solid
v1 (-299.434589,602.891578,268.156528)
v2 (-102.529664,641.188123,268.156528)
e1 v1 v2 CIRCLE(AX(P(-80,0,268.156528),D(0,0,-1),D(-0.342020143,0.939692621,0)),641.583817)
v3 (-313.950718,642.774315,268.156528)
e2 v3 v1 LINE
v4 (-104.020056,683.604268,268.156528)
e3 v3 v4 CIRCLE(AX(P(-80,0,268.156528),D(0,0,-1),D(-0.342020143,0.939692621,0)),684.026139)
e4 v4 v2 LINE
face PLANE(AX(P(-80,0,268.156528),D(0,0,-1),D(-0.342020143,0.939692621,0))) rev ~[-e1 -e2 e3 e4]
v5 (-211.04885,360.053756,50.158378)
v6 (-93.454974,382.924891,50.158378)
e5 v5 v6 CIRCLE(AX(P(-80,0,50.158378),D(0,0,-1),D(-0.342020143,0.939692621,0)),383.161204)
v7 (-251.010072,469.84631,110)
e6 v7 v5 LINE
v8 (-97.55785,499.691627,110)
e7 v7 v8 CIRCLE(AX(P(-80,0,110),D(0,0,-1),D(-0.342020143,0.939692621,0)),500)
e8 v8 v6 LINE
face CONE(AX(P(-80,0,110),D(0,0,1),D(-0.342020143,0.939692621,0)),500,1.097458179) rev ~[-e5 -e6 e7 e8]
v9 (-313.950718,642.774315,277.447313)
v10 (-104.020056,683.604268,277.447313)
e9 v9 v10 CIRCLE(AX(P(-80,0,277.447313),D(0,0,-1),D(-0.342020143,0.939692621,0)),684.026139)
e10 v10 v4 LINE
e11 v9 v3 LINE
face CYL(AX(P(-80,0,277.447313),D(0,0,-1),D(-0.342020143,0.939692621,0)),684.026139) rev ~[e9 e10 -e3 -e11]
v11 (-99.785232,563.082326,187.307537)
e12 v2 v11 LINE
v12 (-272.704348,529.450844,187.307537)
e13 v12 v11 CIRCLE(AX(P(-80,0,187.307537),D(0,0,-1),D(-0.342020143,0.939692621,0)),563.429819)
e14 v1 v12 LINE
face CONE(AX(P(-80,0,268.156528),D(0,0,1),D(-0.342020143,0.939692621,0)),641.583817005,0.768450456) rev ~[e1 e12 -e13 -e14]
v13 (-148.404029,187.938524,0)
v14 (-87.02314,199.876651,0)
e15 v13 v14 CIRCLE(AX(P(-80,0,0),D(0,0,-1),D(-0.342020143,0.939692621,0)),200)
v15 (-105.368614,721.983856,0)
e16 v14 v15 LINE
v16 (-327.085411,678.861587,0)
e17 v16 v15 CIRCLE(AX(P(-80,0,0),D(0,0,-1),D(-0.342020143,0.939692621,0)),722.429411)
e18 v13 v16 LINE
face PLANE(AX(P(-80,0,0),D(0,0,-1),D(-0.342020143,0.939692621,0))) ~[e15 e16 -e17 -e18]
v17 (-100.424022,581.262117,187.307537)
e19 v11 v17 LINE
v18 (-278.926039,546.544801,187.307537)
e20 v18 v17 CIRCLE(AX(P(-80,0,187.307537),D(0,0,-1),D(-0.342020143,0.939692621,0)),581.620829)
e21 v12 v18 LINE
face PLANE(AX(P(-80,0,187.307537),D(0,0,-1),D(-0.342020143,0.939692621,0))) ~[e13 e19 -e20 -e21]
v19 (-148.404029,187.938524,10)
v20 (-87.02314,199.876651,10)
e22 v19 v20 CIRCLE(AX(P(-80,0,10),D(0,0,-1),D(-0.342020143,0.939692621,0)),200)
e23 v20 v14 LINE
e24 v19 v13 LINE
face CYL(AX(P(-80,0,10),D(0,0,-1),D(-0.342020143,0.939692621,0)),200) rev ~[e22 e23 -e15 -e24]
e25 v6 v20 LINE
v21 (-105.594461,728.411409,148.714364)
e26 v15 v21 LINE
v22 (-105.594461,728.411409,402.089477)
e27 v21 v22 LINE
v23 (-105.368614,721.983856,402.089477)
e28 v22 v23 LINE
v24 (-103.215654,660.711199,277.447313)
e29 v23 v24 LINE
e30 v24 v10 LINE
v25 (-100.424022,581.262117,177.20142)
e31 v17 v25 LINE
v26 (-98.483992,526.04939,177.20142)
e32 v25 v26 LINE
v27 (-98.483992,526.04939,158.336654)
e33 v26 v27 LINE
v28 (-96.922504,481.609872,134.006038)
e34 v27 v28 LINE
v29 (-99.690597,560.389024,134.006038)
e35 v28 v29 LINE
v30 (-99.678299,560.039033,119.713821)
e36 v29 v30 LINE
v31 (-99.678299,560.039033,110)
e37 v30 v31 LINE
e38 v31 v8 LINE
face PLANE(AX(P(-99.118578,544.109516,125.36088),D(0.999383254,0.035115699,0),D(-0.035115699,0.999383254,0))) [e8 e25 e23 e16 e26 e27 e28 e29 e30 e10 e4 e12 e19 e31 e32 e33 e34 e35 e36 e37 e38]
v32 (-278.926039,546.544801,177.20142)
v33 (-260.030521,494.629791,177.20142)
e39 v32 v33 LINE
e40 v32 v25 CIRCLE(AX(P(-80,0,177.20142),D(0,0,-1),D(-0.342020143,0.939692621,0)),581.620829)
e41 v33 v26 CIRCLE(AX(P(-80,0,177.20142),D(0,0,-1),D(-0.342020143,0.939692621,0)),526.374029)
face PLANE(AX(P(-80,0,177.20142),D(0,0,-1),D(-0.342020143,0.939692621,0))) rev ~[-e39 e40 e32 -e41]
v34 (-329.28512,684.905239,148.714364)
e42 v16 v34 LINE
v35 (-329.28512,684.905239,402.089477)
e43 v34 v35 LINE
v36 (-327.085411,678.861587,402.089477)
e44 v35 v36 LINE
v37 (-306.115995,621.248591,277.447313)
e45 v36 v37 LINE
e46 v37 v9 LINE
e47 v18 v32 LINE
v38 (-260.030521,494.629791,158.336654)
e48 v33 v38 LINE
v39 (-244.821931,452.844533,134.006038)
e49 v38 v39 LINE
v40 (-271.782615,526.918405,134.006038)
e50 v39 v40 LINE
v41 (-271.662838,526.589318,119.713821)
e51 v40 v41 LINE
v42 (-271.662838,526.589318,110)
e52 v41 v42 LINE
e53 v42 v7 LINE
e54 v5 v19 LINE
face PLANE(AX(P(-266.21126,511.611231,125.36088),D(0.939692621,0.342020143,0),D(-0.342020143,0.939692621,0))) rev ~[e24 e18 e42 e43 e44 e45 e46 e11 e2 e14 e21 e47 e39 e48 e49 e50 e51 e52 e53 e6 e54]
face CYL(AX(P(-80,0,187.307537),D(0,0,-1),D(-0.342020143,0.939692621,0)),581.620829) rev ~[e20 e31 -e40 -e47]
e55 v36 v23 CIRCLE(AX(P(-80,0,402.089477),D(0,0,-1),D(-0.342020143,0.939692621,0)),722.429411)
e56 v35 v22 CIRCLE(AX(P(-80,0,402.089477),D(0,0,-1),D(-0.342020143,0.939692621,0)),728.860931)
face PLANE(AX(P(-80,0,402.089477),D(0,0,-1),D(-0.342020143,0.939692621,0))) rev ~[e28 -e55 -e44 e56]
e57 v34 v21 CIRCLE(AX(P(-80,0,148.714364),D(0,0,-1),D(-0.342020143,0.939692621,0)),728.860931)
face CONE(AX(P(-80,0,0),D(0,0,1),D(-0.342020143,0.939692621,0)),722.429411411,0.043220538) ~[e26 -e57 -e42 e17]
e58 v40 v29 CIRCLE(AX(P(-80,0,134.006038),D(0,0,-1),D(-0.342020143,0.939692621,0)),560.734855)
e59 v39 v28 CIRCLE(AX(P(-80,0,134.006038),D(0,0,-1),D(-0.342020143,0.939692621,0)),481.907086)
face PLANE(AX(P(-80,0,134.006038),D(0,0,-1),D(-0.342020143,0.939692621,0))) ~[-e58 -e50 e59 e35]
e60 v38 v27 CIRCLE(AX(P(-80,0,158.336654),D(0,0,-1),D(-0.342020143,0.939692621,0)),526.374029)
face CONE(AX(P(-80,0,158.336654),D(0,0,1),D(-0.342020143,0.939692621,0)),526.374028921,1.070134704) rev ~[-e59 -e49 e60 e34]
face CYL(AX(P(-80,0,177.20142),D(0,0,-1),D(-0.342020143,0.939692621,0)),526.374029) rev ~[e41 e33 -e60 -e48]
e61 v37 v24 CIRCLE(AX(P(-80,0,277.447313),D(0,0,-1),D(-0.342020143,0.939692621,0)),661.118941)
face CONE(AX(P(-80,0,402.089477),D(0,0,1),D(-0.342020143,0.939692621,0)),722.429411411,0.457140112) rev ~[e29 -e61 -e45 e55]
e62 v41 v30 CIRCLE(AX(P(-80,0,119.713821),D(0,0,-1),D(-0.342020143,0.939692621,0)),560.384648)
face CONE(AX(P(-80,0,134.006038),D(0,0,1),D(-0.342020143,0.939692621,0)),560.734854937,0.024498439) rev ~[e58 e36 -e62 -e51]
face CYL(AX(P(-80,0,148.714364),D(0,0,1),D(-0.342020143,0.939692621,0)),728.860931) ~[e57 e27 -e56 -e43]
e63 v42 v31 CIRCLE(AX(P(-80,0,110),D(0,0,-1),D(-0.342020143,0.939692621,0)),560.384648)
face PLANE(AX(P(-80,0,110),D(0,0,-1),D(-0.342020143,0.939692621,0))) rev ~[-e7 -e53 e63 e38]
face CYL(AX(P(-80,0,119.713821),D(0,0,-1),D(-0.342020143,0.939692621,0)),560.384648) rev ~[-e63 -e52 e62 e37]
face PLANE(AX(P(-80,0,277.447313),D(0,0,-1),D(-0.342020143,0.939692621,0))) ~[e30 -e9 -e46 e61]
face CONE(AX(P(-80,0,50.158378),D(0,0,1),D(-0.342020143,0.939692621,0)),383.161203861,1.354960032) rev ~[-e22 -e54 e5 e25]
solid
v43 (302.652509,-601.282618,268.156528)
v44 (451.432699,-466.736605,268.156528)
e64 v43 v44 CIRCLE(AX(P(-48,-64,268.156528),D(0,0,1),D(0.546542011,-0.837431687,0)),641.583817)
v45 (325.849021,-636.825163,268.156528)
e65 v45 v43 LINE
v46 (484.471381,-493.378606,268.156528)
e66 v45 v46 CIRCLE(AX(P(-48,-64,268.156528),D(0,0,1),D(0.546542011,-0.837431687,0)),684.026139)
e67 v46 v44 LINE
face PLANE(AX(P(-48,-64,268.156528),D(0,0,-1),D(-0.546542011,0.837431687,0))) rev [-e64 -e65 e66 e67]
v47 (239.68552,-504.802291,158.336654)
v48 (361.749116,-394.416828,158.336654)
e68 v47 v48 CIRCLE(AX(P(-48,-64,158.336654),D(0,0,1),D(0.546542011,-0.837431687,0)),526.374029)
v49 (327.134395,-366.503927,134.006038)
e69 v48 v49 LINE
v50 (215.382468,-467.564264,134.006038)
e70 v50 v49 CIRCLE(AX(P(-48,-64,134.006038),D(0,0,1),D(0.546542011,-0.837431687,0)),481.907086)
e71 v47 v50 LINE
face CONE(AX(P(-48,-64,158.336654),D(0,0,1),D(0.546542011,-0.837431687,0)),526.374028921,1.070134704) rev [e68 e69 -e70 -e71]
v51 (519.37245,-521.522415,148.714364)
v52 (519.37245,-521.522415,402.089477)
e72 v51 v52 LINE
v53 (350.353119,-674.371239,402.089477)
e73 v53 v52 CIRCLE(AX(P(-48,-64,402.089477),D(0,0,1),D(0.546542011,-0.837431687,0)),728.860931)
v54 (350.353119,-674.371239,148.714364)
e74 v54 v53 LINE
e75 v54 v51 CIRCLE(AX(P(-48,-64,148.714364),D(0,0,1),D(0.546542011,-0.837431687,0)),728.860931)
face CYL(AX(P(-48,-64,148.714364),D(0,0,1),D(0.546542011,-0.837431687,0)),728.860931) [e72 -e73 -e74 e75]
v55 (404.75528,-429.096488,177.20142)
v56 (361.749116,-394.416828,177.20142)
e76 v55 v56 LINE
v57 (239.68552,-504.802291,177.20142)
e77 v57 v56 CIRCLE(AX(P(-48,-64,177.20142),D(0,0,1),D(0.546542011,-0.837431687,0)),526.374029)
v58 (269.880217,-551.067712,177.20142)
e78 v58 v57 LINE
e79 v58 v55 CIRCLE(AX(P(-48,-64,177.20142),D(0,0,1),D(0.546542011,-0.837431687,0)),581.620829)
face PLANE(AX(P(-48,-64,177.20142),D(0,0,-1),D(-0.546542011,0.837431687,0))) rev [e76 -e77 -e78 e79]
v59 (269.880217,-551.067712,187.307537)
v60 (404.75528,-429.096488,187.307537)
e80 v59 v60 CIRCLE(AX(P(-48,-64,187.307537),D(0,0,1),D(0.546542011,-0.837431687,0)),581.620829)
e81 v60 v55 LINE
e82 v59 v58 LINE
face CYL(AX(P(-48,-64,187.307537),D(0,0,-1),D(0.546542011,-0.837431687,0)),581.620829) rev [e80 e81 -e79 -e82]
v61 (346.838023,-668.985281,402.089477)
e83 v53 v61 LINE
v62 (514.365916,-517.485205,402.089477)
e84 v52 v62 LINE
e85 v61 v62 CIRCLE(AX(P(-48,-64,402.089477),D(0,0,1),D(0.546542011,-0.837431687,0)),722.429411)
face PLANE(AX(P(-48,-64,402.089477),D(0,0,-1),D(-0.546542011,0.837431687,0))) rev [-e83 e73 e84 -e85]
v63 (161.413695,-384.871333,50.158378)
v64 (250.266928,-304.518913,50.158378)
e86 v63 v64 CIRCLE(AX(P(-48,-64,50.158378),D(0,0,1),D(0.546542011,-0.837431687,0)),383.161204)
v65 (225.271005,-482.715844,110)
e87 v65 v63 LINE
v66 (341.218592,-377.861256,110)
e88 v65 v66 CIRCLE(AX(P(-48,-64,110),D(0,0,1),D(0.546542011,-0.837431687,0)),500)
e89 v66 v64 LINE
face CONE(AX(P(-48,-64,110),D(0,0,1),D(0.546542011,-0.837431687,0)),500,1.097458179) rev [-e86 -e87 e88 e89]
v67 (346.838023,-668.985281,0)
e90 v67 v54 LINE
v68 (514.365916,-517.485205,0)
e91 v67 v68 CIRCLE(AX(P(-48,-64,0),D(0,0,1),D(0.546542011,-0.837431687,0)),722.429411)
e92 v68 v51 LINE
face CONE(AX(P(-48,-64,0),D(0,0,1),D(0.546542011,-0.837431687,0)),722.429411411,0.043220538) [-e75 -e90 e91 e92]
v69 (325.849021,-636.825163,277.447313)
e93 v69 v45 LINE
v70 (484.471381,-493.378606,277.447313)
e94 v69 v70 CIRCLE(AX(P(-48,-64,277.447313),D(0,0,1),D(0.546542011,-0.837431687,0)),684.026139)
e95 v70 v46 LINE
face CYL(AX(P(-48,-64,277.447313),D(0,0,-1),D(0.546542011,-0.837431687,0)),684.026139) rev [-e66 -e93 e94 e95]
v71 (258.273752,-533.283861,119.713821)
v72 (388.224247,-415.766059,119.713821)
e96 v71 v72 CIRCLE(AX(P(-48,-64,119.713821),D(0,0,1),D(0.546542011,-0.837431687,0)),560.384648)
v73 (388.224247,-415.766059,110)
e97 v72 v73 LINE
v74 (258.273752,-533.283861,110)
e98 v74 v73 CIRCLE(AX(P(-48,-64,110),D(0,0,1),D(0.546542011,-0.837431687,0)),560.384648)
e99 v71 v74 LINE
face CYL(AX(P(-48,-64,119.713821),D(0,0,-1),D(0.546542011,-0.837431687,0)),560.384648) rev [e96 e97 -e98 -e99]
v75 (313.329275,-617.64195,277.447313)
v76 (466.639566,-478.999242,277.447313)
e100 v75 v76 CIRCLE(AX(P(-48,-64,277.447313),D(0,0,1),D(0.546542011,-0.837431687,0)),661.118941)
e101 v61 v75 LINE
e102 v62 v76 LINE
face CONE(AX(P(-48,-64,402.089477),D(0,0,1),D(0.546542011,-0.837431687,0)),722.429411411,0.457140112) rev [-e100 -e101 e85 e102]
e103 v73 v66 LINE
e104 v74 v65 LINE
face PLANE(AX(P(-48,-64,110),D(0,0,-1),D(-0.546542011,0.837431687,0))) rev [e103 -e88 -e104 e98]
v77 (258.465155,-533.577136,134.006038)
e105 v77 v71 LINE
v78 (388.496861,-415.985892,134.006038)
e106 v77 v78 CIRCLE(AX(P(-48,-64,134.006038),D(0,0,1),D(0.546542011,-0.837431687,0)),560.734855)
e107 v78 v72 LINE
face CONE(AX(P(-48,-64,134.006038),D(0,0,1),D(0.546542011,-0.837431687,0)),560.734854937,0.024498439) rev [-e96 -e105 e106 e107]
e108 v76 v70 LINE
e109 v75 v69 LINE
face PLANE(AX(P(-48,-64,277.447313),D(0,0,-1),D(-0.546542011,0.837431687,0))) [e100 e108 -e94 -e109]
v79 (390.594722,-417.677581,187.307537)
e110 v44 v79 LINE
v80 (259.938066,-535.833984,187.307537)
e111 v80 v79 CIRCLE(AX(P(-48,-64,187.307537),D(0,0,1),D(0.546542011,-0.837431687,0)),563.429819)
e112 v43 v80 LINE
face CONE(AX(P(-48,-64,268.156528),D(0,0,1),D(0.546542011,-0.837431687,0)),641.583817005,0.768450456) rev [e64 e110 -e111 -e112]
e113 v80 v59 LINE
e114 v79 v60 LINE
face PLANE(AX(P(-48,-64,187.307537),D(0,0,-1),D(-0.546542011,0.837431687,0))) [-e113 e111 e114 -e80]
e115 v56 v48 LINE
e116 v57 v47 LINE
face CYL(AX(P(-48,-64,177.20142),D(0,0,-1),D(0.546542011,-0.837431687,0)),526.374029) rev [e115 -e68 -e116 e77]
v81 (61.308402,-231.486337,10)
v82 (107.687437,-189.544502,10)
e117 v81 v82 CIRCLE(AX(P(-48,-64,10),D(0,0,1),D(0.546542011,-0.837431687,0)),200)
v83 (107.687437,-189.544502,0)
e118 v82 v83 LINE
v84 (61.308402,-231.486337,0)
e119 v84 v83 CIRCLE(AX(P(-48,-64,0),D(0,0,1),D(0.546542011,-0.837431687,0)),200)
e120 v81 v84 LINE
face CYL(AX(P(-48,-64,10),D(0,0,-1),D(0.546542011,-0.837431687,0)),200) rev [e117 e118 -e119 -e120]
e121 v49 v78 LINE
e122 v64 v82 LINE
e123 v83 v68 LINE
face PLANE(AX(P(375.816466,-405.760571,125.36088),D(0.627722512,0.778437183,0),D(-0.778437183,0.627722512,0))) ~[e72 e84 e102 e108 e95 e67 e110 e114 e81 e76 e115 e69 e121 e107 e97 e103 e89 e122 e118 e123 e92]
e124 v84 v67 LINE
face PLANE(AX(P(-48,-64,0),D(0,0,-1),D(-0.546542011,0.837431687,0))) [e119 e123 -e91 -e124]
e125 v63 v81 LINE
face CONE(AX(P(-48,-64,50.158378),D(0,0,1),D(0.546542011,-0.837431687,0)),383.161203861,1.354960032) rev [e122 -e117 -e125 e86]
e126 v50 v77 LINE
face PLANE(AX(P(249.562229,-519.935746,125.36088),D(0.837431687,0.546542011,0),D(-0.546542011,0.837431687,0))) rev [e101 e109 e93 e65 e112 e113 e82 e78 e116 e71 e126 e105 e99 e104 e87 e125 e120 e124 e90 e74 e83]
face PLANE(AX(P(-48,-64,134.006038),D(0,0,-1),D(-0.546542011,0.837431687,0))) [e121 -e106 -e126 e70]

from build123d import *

# Parameters (mm, degrees)
F3_ANGLE_START = 250
F3_ANGLE       = 17.9876048978


with BuildPart() as f3:
    # F0 (on Front) → F3 (revolve)
    with BuildSketch(Plane.XZ, mode=Mode.PRIVATE) as f3_sk:
        Polygon((120, 10), (120, 0), (355.2403748035, 0), (642.4294114113, 0), (648.8609313965, 148.714363575), (648.8609313965, 402.0894765854), (642.4294114113, 402.0894765854), (581.1189413071, 277.4473130703), (604.0261387825, 277.4473130703), (604.0261387825, 268.1565284729), (575.0552415848, 268.1565284729), (561.5838170052, 268.1565284729), (483.4298193455, 187.307536602), (501.6208291054, 187.307536602), (501.6208291054, 177.2014200687), (446.3740289211, 177.2014200687), (446.3740289211, 158.3366543055), (401.9070863724, 134.0060383081), (420, 134.0060383081), (480.7348549366, 134.0060383081), (480.3846478462, 119.7138205171), (480.3846478462, 110), (420, 110), (303.1612038612, 50.1583777368), align=None)
    revolve(f3_sk.sketch.rotate(Axis((-80, 0, 35.9871760011), (0, 0, -1)), F3_ANGLE_START), axis=Axis((-80, 0, 35.9871760011), (0, 0, -1)), revolution_arc=F3_ANGLE)


with BuildPart() as f5_1:
    # F5: instance of F3
    add(f3.part.mirror(Plane(origin=(0, 0, 0), x_dir=(0.894427191, 0.4472135955, 0), z_dir=(0.4472135955, -0.894427191, 0))))


solid = Compound([f3.part, f5_1.part])
